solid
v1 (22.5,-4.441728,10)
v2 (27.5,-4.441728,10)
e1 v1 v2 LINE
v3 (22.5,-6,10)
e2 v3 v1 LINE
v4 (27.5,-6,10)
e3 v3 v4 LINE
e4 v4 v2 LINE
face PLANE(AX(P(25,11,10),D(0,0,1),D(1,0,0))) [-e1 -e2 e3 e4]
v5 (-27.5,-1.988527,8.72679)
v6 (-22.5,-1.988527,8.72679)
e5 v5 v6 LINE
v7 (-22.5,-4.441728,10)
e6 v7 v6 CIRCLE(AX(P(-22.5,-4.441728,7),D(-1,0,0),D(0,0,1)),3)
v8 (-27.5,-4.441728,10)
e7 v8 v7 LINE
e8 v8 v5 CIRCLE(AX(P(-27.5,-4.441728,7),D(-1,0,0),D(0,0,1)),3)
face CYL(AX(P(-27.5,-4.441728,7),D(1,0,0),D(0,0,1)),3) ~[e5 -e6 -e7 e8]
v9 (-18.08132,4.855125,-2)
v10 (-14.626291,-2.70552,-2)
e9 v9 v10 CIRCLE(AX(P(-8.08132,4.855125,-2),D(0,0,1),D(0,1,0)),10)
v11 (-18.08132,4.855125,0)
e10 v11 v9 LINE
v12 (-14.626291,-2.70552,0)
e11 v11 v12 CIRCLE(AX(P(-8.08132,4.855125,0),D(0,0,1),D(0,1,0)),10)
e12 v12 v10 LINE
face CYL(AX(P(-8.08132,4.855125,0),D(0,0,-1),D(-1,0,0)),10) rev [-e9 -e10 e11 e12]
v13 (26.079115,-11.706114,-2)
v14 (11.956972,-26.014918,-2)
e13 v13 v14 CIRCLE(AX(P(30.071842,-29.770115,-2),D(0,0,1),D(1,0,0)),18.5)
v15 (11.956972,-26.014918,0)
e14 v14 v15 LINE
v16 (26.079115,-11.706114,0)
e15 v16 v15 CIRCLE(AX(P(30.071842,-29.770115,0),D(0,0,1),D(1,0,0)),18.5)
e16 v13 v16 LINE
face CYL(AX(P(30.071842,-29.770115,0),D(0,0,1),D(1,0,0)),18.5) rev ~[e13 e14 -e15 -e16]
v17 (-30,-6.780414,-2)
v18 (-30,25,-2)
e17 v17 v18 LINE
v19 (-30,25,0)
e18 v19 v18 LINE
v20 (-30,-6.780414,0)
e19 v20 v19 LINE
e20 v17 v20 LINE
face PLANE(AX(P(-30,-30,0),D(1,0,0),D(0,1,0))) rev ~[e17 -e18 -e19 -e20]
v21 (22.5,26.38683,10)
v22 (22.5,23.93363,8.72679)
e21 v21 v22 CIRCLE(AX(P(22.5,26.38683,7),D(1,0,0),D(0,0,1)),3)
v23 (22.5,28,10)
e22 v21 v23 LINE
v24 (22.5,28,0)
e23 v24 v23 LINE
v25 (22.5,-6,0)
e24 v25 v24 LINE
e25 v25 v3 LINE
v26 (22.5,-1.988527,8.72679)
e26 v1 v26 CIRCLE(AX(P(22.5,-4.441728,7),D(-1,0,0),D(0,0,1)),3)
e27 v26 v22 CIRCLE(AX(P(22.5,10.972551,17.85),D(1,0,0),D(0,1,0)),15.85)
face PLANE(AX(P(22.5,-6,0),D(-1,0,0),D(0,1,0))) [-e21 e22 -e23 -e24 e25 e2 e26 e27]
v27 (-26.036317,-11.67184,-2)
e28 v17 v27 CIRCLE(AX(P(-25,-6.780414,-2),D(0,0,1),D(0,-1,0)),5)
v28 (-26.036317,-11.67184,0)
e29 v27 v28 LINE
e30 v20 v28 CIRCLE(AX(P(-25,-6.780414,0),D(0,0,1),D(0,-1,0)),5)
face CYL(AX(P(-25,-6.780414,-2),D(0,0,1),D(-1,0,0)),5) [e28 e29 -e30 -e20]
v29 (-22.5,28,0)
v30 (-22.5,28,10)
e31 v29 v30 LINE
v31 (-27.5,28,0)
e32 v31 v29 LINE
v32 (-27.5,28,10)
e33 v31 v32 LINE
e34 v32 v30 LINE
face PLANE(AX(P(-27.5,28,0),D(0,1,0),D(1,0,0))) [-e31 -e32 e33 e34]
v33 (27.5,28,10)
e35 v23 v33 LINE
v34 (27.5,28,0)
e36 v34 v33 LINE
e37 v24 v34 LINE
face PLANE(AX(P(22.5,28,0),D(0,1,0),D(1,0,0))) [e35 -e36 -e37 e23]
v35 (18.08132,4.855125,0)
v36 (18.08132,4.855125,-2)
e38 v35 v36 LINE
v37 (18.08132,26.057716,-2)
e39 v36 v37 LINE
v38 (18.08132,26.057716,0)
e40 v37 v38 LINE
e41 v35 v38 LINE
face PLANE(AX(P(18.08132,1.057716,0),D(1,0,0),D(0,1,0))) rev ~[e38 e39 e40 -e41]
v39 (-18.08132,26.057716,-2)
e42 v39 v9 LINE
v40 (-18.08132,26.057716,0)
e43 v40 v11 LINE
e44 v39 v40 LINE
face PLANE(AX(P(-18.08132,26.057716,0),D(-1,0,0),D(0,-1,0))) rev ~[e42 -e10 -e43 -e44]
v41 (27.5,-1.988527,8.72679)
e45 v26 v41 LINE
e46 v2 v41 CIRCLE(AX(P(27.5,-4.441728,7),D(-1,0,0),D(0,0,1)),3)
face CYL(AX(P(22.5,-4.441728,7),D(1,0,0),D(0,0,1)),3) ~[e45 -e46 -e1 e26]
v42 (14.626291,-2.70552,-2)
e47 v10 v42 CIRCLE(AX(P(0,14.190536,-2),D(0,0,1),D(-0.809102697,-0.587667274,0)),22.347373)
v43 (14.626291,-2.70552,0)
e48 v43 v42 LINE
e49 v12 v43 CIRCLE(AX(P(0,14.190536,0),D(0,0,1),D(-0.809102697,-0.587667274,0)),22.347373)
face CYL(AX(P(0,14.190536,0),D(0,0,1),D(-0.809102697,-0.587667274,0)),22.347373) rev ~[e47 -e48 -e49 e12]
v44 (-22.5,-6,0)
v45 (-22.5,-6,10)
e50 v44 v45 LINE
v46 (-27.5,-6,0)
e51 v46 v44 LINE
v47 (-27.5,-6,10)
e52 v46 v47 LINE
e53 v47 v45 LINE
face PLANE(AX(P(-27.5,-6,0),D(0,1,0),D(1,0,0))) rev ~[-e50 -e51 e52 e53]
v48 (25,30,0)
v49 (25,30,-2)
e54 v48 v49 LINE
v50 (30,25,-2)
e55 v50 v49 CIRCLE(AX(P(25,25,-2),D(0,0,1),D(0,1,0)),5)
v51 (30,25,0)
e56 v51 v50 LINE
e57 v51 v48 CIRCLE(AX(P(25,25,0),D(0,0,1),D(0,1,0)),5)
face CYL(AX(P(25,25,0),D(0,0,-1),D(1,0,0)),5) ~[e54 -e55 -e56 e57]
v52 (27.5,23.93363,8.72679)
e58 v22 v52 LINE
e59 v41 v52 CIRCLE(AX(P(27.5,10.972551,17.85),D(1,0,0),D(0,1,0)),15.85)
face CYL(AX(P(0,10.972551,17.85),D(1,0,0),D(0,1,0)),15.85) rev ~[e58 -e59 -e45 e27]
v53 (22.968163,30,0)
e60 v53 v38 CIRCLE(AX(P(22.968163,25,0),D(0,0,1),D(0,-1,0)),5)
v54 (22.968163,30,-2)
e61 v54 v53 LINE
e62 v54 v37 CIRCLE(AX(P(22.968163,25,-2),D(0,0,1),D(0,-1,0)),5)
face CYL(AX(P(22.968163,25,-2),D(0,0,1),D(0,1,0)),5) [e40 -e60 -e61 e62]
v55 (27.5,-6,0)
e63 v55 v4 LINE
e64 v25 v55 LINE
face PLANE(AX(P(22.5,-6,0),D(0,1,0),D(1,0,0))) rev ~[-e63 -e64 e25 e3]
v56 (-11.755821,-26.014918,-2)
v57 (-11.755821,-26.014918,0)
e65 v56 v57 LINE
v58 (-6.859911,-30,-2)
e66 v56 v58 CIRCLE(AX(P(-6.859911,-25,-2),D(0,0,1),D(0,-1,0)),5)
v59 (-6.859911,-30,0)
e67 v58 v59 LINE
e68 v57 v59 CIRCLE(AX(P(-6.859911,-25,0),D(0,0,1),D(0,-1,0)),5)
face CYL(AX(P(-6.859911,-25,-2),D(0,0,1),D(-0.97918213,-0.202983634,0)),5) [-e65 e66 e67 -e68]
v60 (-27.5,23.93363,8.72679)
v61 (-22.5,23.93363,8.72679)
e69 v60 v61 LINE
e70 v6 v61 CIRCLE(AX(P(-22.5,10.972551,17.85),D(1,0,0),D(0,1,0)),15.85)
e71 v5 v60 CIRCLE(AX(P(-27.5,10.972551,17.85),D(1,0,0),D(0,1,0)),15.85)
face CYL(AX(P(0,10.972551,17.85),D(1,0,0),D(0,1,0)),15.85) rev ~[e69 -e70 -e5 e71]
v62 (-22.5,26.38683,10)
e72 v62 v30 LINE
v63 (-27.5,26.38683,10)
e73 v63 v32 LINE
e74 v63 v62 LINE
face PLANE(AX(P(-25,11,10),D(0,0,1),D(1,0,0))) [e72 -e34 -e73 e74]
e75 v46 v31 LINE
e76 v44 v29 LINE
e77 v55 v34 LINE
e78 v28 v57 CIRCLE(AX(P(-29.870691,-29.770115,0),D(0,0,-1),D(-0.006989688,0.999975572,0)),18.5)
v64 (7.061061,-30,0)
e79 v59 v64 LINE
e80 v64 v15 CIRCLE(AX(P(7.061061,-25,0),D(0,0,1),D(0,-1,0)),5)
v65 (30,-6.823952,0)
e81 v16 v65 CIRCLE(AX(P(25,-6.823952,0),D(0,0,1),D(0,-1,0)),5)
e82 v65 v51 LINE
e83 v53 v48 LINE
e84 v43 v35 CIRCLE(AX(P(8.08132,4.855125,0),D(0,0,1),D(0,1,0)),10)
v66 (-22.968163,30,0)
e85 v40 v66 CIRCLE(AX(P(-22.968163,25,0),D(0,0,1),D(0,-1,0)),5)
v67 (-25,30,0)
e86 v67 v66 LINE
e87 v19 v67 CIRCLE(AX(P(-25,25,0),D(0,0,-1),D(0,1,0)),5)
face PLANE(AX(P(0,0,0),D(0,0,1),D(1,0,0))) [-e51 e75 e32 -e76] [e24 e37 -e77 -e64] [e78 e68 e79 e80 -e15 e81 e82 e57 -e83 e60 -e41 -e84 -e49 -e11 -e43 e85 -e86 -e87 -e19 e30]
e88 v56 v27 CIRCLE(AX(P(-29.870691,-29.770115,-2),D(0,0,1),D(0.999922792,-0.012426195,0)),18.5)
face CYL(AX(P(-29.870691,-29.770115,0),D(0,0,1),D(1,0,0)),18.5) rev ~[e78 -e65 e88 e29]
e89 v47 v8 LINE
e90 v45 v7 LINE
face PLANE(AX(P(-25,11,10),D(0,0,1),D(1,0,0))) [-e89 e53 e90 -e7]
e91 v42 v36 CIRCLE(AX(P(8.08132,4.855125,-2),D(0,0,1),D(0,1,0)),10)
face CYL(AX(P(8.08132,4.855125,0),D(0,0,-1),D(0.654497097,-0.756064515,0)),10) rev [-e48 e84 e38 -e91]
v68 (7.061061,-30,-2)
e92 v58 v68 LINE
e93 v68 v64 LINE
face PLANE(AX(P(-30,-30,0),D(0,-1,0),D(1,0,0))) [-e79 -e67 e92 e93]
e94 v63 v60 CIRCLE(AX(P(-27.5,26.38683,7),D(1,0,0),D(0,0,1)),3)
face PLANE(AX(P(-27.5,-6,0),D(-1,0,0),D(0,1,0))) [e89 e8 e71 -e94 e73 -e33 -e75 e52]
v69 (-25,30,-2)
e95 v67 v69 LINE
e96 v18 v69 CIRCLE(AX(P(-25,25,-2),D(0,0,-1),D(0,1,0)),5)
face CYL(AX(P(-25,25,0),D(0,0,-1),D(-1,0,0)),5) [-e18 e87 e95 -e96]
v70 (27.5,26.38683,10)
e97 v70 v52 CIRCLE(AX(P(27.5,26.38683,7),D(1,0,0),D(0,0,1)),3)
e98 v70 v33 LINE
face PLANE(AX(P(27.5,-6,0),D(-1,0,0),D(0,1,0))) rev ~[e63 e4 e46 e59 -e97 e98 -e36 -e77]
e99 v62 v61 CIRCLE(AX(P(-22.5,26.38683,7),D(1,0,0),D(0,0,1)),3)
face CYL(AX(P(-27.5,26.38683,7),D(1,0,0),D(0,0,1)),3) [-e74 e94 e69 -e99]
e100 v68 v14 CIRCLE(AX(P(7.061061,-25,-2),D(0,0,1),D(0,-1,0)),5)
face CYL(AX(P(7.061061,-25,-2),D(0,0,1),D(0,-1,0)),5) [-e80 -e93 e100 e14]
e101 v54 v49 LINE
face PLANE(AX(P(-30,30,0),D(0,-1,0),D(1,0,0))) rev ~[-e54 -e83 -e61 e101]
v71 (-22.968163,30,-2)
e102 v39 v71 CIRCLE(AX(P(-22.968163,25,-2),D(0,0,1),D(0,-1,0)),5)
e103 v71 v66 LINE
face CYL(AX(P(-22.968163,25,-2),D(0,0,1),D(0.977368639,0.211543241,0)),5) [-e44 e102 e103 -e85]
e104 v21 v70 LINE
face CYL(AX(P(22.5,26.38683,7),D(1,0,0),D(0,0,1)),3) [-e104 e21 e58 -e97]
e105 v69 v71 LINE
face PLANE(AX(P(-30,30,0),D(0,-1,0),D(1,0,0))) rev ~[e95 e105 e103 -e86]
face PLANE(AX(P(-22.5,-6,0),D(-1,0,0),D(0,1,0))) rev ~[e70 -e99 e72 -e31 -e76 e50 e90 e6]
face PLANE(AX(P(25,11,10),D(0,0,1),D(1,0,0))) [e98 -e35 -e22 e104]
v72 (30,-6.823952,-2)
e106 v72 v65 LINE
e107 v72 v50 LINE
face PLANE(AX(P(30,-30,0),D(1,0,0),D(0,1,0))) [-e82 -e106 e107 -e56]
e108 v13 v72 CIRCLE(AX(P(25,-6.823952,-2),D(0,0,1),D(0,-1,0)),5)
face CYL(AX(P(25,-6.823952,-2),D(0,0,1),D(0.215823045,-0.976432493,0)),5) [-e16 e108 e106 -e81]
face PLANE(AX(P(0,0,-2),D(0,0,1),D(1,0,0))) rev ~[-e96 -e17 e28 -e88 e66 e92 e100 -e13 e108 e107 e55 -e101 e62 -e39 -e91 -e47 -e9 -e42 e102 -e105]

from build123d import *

# Parameters (mm, degrees)
F0_W      = 60
F0_H      = 60
F1_DEPTH  = 2
F2_W      = 5
F2_H      = 34
F3_DEPTH  = 10
F4_R      = 15.85
F5_DEPTH  = 30
F6_R      = 18.5
F7_DEPTH  = 3.5
F8_R      = 5
F10_DEPTH = 4
F11_R     = 10
F12_R     = 3


# Not quite as in the source:
# - a feature names something its author has since deleted; it is built from what else it names


with BuildPart() as f1:
    # F0 (on Top) → F1 (new body)
    with BuildSketch(Plane.XY):
        Rectangle(F0_W, F0_H)
    extrude(amount=-F1_DEPTH)

    # F2 (on face) → F3 (join)
    with BuildSketch(Plane.XY):
        with Locations((-25, 11)):
            Rectangle(F2_W, F2_H)
        with Locations((25, 11)):
            Rectangle(F2_W, F2_H)
    extrude(amount=F3_DEPTH)

    # F4 (on Right) → F5 (cut, symmetric)
    with BuildSketch(Plane.YZ):
        with Locations((10.9725513698, 17.85)):
            Circle(F4_R)
    extrude(amount=F5_DEPTH, both=True, mode=Mode.SUBTRACT)

    # F6 (on Top) → F7 (cut)
    with BuildSketch(Plane.XY):
        with Locations((-29.8706907779, -29.7701153904)):
            Circle(F6_R)
        with Locations((0, 29.9712661654)):
            Circle(F6_R)
        with Locations((30.0718415529, -29.7701153904)):
            Circle(F6_R)
    extrude(amount=-F7_DEPTH, mode=Mode.SUBTRACT)

    # F8
    f8_edges = [f1.edges().sort_by_distance(p)[0] for p in [
        (-30, -11.270567, -1),
        (-11.372119, -30, -1),
        (11.57327, -30, -1),
        (30, -11.270255, -1),
        (30, 30, -1),
        (18.499978, 30, -1),
        (-18.499978, 30, -1),
        (-30, 30, -1),
    ]]
    fillet(f8_edges, radius=F8_R)

    # F9 (on face) → F10 (cut)
    with BuildSketch(Plane.XY):
        with BuildLine():
            Line((18.0813198277, 1.0577162054), (18.0813198277, 26.0577162054))
            ThreePointArc((18.0813198277, 26.0577162054), (0, 11.4712661654), (-18.0813198277, 26.0577162054))
            Line((-18.0813198277, 26.0577162054), (-18.0813198277, 1.0577162054))
            ThreePointArc((-18.0813198277, 1.0577162054), (0, -8.1568370453), (18.0813198277, 1.0577162054))
        make_face()
    extrude(amount=-F10_DEPTH, mode=Mode.SUBTRACT)

    # F11
    f11_edges = [f1.edges().sort_by_distance(p)[0] for p in [
        (-18.08132, 1.057716, -1),
        (18.08132, 1.057716, -1),
    ]]
    fillet(f11_edges, radius=F11_R)

    # F12
    f12_edges = [f1.edges().sort_by_distance(p)[0] for p in [
        (-25, 24.742083, 10),
        (-25, -2.79698, 10),
        (25, 24.742083, 10),
        (25, -2.79698, 10),
    ]]
    fillet(f12_edges, radius=F12_R)


solid = f1.part
